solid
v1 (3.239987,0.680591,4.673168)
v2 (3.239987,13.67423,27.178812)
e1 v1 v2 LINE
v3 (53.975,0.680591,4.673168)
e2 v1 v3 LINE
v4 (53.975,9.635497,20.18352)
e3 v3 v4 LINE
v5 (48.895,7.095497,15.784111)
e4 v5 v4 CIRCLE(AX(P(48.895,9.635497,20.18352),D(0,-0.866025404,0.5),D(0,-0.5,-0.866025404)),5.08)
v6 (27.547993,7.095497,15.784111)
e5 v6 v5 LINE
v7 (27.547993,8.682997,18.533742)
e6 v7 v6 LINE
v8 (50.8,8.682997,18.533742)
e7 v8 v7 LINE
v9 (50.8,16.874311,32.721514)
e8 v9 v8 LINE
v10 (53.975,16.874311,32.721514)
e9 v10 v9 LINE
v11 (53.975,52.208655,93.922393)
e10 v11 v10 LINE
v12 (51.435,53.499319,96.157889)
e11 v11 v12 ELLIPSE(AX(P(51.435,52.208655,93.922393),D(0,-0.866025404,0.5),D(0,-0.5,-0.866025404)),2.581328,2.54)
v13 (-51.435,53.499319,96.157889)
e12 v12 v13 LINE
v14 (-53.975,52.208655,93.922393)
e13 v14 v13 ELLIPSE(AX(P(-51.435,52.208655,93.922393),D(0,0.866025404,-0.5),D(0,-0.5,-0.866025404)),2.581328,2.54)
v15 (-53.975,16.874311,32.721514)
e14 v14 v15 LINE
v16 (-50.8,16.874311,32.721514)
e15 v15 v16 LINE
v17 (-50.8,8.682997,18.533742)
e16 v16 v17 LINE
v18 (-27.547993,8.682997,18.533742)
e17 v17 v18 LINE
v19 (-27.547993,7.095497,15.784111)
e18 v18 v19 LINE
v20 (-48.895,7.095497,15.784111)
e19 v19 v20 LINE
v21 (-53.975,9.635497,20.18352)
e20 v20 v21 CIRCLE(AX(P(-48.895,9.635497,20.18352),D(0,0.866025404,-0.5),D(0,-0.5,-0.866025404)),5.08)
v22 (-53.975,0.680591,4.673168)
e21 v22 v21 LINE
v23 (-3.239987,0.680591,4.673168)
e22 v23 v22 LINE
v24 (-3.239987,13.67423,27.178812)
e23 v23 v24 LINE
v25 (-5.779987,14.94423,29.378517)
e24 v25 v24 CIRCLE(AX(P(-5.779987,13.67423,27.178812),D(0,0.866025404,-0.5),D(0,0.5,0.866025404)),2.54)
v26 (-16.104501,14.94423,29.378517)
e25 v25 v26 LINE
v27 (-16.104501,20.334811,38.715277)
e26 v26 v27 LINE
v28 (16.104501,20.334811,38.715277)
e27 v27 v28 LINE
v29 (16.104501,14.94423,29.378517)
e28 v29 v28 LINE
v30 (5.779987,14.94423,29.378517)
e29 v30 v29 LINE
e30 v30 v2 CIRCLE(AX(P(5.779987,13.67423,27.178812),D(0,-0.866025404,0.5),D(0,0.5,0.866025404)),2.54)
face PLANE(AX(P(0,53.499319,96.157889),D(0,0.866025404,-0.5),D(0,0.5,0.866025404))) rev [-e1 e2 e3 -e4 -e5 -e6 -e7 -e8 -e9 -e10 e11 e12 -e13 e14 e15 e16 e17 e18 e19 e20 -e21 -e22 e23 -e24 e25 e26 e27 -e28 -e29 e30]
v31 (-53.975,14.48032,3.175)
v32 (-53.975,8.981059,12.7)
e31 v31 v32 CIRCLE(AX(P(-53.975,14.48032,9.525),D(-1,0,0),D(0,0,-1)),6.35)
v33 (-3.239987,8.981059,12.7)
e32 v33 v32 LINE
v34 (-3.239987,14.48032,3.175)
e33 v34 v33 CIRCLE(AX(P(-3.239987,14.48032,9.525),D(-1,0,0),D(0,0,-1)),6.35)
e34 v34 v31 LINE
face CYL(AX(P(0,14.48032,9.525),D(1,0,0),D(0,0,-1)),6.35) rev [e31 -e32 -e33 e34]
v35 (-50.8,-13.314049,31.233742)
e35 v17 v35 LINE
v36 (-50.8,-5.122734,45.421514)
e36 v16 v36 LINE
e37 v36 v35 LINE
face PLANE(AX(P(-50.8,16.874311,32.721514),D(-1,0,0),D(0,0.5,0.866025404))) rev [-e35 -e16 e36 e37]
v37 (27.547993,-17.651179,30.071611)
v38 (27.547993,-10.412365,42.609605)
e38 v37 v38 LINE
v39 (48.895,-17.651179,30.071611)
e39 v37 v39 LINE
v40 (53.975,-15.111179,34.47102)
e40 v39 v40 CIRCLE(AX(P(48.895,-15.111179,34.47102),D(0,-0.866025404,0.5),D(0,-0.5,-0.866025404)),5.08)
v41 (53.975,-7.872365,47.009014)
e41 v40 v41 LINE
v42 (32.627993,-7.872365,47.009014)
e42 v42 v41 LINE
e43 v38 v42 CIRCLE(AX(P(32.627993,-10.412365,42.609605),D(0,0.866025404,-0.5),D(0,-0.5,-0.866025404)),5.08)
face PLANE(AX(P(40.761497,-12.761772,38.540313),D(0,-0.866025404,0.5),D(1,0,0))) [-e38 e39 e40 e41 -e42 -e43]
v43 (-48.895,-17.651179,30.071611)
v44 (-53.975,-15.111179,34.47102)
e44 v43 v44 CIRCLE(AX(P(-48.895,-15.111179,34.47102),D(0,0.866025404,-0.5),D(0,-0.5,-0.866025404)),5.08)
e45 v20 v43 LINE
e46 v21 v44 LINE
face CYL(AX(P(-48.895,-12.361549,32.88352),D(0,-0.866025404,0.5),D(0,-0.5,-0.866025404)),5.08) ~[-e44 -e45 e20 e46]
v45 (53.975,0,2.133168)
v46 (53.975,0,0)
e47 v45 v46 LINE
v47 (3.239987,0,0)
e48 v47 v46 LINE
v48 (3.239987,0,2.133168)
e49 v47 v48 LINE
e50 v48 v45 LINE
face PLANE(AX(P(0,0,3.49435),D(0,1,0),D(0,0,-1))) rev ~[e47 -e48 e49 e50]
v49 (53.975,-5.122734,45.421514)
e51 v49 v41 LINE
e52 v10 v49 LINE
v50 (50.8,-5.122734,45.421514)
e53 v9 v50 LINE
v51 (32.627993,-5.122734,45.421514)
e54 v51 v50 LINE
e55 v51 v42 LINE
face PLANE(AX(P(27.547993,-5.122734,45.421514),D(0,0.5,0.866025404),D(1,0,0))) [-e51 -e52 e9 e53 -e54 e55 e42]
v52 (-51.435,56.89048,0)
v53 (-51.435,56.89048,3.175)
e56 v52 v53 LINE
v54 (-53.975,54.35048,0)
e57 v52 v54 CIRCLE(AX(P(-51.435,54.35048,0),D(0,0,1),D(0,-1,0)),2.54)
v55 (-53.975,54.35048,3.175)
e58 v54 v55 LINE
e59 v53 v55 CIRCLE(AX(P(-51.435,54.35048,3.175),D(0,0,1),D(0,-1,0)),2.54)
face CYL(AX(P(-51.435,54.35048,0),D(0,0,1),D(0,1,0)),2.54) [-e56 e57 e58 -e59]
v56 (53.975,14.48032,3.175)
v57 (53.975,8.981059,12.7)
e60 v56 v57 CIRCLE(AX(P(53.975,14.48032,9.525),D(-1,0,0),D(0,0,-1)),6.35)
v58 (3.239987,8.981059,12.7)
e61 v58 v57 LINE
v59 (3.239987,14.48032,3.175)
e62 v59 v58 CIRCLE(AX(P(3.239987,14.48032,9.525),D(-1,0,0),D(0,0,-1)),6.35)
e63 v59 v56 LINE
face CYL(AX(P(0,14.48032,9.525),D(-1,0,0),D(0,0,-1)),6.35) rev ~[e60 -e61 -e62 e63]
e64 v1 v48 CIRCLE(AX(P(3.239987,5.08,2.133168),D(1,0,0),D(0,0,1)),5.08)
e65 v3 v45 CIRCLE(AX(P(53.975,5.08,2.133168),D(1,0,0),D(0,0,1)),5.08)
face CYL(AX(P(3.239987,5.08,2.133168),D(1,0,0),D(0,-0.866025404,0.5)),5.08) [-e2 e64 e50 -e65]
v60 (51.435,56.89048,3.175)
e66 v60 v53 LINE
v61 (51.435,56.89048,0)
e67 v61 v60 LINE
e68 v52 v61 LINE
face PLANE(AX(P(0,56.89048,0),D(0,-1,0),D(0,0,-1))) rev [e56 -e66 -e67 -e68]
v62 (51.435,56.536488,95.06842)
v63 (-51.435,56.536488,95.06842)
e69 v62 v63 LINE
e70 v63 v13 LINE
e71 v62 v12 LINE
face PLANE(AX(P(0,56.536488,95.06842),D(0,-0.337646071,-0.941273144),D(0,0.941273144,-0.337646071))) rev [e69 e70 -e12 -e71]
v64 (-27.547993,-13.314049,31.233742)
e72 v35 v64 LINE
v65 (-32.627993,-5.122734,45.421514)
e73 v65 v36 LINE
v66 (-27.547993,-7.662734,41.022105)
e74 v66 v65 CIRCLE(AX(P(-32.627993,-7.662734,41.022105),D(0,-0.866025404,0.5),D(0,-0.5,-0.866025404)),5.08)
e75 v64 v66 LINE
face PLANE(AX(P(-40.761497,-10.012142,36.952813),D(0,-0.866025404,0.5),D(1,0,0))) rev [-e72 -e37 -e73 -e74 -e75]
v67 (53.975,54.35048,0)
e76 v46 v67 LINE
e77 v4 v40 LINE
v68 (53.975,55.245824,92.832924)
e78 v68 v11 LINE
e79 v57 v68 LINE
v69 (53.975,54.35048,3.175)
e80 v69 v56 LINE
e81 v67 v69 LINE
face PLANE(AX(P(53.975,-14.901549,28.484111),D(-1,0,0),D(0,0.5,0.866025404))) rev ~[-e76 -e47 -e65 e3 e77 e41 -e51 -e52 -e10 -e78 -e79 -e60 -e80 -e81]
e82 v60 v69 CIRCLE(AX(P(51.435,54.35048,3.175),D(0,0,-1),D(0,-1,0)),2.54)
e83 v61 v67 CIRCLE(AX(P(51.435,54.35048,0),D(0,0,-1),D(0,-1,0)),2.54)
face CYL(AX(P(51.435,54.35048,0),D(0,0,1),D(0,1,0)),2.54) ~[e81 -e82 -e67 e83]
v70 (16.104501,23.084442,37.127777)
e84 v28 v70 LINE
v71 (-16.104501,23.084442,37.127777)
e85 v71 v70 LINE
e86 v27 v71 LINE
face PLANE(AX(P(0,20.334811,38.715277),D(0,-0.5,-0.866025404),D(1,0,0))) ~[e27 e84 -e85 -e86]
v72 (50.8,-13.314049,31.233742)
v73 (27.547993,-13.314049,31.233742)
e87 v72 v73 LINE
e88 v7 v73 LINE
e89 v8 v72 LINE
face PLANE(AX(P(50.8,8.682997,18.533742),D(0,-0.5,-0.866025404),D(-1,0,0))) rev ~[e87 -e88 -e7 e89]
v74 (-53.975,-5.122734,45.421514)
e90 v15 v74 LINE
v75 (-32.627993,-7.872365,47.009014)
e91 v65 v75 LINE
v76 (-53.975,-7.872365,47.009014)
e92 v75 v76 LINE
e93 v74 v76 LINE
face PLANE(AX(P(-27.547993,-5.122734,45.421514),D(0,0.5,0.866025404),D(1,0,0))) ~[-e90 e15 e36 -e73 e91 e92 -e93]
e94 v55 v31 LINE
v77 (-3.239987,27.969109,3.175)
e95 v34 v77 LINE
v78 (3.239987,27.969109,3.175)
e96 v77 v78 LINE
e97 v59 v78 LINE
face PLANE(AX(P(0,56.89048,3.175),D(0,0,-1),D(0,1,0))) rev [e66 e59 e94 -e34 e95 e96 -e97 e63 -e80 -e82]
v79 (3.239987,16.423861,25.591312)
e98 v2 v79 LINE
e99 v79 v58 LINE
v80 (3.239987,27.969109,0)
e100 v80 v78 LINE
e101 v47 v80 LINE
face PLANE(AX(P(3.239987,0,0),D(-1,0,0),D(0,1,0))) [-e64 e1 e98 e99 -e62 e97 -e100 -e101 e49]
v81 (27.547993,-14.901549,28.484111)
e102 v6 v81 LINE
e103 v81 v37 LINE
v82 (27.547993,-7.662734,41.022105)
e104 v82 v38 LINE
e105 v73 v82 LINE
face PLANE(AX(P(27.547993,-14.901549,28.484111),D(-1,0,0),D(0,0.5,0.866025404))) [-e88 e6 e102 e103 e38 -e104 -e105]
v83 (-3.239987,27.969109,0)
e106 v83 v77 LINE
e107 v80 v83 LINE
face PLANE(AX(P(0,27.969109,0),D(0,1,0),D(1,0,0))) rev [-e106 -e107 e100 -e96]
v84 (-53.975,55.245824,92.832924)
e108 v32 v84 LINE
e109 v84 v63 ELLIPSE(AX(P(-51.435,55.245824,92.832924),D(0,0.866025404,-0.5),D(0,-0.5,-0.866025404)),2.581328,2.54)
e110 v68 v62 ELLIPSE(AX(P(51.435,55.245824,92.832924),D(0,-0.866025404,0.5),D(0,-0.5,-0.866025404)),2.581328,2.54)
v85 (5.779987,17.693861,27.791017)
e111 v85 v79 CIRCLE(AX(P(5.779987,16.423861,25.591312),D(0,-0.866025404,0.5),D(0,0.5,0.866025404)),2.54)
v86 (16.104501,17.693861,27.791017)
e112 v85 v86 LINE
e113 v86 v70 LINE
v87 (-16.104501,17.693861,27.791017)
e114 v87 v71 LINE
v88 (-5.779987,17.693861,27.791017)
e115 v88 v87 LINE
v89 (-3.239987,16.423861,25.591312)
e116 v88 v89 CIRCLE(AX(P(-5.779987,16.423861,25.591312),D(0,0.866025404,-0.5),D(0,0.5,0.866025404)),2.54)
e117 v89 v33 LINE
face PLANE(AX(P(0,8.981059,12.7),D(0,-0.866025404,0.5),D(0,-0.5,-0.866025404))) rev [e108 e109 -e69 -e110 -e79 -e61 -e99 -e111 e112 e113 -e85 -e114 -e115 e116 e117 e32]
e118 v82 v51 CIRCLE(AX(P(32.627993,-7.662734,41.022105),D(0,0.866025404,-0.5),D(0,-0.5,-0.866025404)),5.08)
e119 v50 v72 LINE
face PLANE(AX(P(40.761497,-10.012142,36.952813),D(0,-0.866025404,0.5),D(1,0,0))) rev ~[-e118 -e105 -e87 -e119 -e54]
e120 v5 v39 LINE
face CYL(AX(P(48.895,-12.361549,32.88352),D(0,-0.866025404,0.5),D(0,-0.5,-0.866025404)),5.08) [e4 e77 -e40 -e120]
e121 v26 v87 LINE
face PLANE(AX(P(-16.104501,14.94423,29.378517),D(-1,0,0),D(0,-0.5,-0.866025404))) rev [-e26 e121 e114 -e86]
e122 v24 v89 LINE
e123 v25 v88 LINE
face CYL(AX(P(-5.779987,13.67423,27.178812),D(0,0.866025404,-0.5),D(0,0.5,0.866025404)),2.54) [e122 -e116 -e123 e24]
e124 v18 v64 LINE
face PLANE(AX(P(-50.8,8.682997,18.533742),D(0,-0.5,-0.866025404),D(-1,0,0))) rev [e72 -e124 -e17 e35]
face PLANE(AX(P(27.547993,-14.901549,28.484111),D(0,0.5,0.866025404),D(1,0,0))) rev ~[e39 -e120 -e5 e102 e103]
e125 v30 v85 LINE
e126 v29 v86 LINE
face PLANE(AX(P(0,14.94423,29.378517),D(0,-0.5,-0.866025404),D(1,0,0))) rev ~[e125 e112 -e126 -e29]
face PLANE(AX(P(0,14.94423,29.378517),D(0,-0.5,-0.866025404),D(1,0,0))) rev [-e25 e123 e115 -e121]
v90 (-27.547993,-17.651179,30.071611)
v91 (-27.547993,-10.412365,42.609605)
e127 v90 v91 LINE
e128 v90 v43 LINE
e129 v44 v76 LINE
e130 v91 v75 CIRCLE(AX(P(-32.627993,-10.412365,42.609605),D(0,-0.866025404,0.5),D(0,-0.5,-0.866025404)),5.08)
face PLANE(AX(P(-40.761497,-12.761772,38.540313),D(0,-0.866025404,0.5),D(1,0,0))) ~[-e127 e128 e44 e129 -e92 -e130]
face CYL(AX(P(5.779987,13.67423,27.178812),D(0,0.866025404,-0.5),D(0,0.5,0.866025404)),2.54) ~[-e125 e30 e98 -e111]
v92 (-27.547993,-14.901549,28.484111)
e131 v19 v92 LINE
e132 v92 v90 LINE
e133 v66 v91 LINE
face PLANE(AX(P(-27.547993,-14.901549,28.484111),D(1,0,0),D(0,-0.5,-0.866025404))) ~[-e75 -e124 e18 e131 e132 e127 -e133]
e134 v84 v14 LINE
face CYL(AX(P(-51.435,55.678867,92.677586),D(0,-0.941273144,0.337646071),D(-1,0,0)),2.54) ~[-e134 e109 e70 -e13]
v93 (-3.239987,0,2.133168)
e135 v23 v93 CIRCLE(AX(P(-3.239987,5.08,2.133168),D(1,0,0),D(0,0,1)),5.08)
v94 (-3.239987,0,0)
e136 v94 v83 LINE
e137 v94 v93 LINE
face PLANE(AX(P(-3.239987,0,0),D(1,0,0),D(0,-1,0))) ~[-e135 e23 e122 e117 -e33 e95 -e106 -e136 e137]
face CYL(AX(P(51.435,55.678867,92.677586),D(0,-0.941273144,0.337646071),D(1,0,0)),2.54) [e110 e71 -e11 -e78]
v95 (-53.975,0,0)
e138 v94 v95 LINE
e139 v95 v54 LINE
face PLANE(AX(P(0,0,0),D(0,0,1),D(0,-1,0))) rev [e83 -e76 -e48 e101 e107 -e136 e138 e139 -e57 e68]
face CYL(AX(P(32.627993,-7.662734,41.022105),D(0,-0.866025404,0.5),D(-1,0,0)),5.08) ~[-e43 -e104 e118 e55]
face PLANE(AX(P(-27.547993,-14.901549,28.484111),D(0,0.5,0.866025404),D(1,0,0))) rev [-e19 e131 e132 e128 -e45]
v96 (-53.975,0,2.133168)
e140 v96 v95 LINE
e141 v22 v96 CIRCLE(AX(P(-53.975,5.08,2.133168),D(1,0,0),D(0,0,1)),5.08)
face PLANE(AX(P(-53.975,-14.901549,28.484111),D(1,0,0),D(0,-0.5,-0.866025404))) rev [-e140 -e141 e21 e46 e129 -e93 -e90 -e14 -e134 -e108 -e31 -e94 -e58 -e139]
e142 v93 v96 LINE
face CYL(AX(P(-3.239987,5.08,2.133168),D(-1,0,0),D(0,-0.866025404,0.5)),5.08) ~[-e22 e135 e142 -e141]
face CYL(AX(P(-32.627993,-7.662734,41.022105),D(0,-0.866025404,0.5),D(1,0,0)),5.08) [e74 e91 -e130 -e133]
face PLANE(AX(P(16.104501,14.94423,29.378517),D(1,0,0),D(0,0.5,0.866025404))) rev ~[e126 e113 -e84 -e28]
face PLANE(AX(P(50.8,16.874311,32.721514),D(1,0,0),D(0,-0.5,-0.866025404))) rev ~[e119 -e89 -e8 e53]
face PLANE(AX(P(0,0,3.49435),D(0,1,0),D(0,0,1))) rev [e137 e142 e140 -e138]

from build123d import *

# Parameters (mm, degrees)
F1_DEPTH = 53.975
F3_DEPTH = 25.4
F4_W     = 16.1045007408
F4_H     = 10.7811614871
F5_DEPTH = 3.175
F6_W     = 3.2399867196
F6_H     = 27.9691088945
F7_REACH = 124.3150351858
F8_W     = 26.4270068914
F8_H     = 19.5576284379
F9_DEPTH = 3.175
F10_R    = 5.08
F11_R    = 2.54


with BuildPart() as f1:
    # F0 (on Right) → F1 (new body)
    with BuildSketch(Plane.YZ):
        with BuildLine():
            Line((0, 0), (56.8904802203, 0))
            Line((56.8904802203, 0), (56.8904802203, 3.175))
            Line((56.8904802203, 3.175), (14.4803198381, 3.175))
            ThreePointArc((14.4803198381, 3.175), (8.981058524, 6.35), (8.981058524, 12.7))
            Line((8.981058524, 12.7), (56.5364878665, 95.0684197969))
            Line((56.5364878665, 95.0684197969), (53.4993190127, 96.1578890309))
            Line((53.4993190127, 96.1578890309), (0, 3.4943503306))
            Line((0, 3.4943503306), (0, 0))
        make_face()
    extrude(amount=F1_DEPTH)

    # F2 (on face) → F3 (join)
    with BuildSketch(Plane(origin=(0, -1.513098078, 0.8735875827), x_dir=(1, 0, 0), z_dir=(0, -0.8660254038, 0.5))):
        Polygon((27.5479931086, 17.2171894163), (53.975, 17.2171894163), (53.975, 36.7748178542), (50.8, 36.7748178542), (50.8, 20.3921894163), (27.5479931086, 20.3921894163), align=None)
    extrude(amount=F3_DEPTH)

    # F4 (on face) → F5 (cut, through all)
    with BuildSketch(Plane(origin=(0, -1.513098078, 0.8735875827), x_dir=(1, 0, 0), z_dir=(0, -0.8660254038, 0.5))):
        with Locations((8.0522503704, 38.3052378893)):
            Rectangle(F4_W, F4_H)
    extrude(amount=-F5_DEPTH, mode=Mode.SUBTRACT)

    f7_end = Plane(origin=(8.0522503704, 16.3190458234, 28.5847668277), x_dir=(0, 0.8660254038, -0.5), z_dir=(0, 0.5, 0.8660254038))
    # F6 (on Top) → F7 (cut, up to a plane its end follows)
    with BuildSketch(Plane.XY):
        with Locations((1.6199933598, 13.9845544472)):
            Rectangle(F6_W, F6_H)
    f7_long = extrude(amount=F7_REACH, mode=Mode.PRIVATE)
    add(split(f7_long, bisect_by=f7_end, keep=Keep.BOTTOM, mode=Mode.PRIVATE), mode=Mode.SUBTRACT)

    # F8 (on face) → F9 (join)
    with BuildSketch(Plane(origin=(0, -23.5101433341, 13.5735875827), x_dir=(1, 0, 0), z_dir=(0, -0.8660254038, 0.5))):
        with Locations((40.7614965543, 26.9960036352)):
            Rectangle(F8_W, F8_H)
    extrude(amount=F9_DEPTH)

    # F10
    f10_edges = [f1.edges().sort_by_distance(p)[0] for p in [
        (28.607493, 0, 3.49435),
        (53.975, -5.277841, 22.927861),
        (27.547993, -6.49755, 46.215264),
    ]]
    fillet(f10_edges, radius=F10_R)

    # F11
    f11_edges = [f1.edges().sort_by_distance(p)[0] for p in [
        (53.975, 55.017903, 95.613154),
        (53.975, 56.89048, 1.5875),
        (3.239987, 16.319046, 28.584767),
    ]]
    fillet(f11_edges, radius=F11_R)

    # F12: F1 across plane


with BuildPart() as f1_1:
    add(f1.part)
    add(f1.part.mirror(Plane.YZ))


solid = f1_1.part
